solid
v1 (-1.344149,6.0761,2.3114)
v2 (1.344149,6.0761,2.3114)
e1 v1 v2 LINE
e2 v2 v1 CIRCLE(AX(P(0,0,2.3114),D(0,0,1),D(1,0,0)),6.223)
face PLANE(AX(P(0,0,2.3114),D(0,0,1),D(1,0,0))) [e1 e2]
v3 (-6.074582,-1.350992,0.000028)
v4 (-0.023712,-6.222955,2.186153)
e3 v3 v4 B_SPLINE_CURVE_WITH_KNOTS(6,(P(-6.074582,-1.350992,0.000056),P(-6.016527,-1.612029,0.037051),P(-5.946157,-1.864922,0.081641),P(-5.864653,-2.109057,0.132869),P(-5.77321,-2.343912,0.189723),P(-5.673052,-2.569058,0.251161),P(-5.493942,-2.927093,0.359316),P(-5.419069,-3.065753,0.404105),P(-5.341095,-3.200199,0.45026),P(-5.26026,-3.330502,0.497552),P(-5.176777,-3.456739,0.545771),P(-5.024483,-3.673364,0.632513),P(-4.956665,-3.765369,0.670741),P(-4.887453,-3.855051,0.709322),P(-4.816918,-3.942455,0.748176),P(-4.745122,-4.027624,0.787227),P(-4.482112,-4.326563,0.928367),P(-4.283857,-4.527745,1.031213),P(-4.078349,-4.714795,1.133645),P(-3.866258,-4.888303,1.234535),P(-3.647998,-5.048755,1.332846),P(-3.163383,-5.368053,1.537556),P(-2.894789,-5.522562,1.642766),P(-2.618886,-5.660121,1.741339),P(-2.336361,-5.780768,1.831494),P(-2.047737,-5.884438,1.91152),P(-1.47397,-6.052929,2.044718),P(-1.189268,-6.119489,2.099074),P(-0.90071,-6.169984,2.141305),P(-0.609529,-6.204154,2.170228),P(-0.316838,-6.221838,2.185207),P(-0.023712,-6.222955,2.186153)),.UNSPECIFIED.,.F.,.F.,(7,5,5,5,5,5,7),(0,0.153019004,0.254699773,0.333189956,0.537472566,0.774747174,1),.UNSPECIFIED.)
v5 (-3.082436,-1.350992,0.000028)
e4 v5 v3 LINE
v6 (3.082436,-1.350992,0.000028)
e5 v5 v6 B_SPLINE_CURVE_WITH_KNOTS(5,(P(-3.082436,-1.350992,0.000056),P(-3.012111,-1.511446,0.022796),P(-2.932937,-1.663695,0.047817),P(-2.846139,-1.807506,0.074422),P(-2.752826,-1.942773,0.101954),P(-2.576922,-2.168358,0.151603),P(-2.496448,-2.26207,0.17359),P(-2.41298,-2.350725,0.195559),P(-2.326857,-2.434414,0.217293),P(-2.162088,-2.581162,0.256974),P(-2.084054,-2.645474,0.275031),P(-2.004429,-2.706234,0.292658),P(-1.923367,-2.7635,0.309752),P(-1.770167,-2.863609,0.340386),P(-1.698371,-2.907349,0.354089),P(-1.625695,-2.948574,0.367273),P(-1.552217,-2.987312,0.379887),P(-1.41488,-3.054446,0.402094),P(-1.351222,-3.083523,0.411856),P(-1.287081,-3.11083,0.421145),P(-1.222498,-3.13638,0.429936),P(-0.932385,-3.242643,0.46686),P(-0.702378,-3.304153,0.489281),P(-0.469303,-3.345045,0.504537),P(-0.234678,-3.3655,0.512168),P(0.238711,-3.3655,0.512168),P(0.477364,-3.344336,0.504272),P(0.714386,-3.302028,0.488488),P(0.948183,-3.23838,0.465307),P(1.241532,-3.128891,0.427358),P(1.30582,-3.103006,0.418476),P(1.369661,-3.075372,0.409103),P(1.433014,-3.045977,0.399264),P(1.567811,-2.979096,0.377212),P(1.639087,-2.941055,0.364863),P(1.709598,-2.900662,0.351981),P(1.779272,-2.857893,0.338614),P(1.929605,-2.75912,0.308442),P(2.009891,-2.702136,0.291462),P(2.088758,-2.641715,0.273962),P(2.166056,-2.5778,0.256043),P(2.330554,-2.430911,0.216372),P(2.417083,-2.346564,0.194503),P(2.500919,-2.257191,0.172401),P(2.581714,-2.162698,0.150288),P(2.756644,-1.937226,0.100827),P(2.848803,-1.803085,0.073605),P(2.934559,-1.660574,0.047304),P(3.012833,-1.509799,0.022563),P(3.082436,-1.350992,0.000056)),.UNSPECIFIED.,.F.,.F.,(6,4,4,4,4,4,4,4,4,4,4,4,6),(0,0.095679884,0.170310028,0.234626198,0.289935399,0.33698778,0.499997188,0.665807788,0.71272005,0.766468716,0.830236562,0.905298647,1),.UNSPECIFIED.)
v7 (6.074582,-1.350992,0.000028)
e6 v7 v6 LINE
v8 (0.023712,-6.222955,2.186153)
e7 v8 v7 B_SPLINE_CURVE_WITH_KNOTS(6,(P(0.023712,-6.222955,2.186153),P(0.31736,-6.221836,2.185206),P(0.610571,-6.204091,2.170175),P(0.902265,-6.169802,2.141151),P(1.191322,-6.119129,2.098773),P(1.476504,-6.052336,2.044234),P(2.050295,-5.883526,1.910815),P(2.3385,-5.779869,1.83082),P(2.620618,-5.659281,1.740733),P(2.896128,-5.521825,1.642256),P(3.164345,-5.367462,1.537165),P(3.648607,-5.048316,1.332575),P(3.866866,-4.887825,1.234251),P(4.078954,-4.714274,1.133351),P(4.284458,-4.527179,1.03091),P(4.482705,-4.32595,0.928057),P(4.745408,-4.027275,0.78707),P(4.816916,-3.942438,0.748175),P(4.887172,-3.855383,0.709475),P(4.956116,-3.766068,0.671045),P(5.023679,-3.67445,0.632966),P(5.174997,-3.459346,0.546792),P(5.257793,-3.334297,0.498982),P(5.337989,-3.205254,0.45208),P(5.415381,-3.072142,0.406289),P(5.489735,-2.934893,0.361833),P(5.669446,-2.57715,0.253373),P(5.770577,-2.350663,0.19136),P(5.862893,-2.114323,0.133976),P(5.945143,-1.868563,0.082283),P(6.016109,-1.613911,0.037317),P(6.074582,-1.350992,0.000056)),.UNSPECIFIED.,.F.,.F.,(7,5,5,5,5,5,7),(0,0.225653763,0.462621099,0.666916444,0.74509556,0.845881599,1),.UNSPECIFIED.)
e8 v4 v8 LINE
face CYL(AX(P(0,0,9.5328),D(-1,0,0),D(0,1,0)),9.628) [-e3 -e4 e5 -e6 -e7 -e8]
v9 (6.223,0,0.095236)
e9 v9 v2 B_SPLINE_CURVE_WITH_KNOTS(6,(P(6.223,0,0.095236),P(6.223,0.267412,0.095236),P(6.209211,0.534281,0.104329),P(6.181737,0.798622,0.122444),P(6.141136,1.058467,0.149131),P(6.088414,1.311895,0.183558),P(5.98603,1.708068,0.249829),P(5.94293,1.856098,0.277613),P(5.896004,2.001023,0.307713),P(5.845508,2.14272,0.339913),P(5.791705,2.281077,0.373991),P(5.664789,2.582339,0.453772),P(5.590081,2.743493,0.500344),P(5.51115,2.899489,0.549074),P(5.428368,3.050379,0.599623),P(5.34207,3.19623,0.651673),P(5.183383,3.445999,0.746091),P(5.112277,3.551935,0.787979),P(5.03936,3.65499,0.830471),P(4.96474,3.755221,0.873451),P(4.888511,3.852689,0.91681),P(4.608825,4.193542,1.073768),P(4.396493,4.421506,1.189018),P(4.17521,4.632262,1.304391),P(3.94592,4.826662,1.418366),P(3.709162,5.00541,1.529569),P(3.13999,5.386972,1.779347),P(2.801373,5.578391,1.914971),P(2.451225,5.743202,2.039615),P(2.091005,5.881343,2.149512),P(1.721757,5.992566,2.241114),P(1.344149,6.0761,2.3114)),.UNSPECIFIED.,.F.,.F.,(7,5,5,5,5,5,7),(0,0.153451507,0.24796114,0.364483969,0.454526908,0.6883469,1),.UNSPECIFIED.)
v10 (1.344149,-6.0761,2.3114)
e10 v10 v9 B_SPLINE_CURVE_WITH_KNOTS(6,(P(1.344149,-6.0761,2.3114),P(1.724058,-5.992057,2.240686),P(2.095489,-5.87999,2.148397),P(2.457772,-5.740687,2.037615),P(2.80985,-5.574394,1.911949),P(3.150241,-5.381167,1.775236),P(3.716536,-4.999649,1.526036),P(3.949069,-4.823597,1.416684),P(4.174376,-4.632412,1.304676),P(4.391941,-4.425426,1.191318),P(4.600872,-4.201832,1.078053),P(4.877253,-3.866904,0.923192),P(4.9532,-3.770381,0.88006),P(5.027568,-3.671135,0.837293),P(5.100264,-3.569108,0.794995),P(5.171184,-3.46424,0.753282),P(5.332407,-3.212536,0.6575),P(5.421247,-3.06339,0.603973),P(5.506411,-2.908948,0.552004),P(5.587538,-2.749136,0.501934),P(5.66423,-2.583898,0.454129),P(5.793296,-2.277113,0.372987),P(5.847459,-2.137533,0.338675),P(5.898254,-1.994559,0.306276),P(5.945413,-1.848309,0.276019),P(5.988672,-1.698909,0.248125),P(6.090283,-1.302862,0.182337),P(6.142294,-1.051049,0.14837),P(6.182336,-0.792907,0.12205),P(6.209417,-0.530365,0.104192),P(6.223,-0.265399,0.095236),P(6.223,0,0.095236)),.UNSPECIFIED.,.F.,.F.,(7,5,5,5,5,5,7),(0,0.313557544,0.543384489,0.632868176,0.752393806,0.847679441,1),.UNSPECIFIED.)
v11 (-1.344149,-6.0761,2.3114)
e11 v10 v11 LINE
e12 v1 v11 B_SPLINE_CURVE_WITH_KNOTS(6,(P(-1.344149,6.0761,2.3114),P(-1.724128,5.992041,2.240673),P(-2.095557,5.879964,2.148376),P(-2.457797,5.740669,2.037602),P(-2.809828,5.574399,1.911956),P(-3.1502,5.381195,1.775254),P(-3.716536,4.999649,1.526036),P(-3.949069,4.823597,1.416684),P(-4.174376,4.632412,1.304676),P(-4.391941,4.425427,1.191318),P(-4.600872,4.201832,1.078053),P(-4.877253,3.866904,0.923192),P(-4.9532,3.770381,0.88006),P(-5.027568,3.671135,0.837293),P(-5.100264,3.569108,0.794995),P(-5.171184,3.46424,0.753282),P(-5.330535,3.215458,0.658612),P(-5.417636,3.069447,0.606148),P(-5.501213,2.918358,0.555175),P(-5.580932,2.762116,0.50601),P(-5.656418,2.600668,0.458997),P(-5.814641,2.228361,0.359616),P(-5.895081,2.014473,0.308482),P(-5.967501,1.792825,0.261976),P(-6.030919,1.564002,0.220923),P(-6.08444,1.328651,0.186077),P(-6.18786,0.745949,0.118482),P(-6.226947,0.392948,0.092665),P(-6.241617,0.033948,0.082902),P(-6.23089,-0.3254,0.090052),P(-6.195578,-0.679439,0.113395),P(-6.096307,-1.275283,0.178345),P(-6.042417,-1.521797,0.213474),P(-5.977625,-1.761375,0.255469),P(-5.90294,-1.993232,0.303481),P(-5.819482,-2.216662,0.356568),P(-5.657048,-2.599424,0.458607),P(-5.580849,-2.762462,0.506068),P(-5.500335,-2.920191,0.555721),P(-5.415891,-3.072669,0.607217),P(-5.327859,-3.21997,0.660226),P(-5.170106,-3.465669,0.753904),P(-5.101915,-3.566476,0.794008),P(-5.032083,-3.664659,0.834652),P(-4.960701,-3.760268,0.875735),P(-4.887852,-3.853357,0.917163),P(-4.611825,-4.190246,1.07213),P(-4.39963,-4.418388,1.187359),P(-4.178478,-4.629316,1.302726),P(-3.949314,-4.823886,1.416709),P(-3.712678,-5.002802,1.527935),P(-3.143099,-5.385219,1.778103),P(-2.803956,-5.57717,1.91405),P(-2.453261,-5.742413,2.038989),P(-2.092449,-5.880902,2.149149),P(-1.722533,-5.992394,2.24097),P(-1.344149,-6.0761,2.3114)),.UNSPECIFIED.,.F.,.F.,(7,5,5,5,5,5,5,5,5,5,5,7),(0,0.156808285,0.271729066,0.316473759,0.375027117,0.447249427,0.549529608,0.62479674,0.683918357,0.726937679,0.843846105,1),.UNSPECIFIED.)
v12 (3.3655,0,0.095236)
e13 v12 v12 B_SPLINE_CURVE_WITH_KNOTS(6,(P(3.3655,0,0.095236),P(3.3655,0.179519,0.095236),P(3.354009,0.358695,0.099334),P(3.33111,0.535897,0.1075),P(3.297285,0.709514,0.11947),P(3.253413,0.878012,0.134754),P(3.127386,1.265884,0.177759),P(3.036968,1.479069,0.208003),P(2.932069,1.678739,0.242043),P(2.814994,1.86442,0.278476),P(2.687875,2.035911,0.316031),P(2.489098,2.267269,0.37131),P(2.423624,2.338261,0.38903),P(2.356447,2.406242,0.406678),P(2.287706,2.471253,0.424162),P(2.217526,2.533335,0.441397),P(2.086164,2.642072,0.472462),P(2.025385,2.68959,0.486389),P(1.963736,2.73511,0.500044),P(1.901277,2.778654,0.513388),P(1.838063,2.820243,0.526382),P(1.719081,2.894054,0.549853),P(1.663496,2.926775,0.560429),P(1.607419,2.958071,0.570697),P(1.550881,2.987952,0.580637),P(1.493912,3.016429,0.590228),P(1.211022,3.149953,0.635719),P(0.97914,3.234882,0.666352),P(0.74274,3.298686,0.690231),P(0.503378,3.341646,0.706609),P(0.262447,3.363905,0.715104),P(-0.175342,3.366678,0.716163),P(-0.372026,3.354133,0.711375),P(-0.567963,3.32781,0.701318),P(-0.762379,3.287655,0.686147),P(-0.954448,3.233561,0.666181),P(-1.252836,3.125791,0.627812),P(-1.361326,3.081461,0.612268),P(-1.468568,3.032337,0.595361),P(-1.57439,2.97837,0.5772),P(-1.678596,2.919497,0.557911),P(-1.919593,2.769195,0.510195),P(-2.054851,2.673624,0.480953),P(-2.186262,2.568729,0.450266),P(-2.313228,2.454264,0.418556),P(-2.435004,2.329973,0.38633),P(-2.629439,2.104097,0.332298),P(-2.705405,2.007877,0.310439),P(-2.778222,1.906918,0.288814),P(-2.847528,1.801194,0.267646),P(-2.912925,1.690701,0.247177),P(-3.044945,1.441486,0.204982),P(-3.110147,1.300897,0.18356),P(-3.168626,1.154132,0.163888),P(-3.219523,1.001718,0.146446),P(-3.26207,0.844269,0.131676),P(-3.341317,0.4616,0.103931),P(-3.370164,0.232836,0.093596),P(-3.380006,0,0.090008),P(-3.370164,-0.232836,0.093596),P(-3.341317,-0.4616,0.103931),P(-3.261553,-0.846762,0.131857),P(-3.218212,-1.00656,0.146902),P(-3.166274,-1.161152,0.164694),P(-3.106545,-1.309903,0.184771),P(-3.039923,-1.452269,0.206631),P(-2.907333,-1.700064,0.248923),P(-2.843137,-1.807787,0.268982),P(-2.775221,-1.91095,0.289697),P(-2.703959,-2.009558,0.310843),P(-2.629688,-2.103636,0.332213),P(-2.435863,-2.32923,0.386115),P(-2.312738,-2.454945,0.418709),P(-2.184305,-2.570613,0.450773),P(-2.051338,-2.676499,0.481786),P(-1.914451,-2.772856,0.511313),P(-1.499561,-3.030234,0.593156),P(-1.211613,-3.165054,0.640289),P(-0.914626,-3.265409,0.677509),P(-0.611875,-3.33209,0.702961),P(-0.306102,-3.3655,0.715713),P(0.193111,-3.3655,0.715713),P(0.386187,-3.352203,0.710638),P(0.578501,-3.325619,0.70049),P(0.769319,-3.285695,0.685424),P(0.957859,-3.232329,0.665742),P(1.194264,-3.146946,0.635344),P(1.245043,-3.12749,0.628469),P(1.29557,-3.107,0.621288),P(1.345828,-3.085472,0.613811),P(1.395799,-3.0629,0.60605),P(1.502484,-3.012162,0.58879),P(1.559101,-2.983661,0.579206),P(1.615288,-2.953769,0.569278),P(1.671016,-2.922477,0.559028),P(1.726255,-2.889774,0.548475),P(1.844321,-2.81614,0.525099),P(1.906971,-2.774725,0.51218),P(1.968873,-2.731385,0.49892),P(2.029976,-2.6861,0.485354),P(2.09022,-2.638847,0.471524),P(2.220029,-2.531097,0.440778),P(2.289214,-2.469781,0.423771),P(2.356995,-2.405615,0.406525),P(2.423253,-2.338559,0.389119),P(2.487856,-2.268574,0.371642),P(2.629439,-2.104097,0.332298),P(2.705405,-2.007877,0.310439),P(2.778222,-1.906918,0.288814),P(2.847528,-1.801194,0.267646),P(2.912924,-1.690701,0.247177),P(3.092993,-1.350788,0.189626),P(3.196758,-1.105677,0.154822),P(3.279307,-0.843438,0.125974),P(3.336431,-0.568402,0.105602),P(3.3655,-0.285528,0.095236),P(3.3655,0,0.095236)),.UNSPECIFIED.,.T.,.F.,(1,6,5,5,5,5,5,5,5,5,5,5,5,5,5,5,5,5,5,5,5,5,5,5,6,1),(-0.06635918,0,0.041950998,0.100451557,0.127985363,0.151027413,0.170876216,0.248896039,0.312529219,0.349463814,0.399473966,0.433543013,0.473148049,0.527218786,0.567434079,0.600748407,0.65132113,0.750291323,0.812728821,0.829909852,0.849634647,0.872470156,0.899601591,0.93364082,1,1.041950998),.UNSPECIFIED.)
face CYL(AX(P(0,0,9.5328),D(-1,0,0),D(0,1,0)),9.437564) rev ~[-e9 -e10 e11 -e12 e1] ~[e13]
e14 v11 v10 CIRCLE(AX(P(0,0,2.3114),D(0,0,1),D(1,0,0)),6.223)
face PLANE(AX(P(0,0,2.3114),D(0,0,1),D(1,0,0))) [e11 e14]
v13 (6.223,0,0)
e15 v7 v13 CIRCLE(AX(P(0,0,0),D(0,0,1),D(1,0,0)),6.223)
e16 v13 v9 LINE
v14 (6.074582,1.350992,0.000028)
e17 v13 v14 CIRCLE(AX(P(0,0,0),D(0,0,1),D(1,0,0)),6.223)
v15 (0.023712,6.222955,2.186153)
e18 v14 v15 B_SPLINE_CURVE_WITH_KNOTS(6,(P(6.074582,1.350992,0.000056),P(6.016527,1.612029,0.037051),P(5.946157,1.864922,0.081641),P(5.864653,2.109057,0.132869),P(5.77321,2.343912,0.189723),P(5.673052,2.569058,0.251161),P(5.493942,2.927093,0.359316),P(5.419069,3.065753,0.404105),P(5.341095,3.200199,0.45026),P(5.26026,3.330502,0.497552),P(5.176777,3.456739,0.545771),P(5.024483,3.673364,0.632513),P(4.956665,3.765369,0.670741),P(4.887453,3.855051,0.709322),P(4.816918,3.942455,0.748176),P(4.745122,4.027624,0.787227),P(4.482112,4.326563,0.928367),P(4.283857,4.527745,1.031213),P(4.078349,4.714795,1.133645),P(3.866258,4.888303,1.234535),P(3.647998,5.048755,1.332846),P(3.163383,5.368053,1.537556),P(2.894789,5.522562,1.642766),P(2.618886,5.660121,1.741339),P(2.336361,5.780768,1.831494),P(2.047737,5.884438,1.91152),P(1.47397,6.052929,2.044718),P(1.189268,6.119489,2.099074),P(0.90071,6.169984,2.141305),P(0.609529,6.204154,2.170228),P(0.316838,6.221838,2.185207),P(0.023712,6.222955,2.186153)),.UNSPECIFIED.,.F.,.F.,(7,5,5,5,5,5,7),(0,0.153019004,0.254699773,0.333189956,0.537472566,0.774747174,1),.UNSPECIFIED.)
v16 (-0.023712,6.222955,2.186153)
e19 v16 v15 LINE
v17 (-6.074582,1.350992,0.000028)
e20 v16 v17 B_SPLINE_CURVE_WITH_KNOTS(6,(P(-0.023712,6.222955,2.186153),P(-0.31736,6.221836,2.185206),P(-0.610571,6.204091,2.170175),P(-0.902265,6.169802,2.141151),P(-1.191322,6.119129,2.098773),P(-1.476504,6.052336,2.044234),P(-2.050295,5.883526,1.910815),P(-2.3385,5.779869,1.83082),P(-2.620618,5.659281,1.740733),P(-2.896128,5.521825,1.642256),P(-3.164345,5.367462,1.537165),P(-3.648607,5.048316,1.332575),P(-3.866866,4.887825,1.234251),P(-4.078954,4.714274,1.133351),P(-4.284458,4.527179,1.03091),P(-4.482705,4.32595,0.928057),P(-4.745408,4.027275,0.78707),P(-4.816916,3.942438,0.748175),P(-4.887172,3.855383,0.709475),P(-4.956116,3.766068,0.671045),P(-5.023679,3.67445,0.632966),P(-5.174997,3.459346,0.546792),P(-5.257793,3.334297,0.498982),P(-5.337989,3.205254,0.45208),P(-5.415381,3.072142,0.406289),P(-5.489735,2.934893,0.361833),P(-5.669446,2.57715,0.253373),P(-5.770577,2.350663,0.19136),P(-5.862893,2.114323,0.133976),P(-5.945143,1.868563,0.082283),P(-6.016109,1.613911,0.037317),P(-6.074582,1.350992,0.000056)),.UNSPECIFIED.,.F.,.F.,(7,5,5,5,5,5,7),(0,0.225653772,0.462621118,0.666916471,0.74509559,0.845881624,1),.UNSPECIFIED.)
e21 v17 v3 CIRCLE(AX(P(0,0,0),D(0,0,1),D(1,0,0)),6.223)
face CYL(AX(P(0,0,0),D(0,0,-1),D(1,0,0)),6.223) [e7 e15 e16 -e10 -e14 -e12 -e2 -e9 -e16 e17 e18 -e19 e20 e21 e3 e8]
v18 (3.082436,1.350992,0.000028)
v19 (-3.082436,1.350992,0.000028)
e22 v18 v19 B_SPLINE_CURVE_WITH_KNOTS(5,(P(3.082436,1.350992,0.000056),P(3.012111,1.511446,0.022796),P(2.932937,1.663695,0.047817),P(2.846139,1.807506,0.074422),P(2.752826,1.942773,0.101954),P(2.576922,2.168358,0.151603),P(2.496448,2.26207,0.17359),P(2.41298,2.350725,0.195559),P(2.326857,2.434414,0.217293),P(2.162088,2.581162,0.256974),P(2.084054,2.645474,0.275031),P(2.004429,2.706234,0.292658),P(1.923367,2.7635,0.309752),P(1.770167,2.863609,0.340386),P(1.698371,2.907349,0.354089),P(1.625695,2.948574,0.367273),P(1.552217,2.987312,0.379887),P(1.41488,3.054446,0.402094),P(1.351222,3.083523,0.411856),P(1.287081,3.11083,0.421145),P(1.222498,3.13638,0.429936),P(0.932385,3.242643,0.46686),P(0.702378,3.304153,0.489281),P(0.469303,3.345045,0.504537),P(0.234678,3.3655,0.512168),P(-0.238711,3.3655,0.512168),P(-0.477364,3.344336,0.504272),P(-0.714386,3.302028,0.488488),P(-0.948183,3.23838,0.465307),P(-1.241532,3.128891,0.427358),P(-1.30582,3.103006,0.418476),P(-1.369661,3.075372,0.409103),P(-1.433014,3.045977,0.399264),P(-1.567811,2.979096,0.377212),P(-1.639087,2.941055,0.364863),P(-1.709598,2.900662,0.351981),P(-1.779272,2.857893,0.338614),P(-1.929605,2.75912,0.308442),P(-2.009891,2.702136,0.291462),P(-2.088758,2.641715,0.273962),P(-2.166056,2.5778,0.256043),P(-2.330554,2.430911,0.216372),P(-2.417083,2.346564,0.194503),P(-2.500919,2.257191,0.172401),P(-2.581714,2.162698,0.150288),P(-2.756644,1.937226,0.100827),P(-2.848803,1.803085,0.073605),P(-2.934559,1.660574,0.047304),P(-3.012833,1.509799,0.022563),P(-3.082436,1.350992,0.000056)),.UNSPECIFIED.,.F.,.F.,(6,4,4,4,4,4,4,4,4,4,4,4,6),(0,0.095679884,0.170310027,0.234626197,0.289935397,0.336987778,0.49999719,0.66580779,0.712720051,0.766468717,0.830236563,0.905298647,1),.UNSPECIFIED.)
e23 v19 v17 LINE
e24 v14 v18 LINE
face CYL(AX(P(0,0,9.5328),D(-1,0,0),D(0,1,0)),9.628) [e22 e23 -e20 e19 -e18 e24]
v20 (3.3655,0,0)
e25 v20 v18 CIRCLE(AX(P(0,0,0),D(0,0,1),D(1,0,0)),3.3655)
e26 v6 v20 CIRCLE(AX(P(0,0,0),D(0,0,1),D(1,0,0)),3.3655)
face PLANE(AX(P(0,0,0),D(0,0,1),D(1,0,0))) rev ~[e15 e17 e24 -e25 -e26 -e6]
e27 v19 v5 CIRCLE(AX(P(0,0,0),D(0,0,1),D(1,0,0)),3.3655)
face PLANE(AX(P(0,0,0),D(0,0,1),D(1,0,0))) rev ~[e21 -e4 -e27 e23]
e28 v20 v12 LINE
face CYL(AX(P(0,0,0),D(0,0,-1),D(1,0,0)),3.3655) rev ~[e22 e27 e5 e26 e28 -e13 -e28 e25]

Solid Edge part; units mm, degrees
sketch "Sketch1" plane through (0, 0, 0) normal (0, 0, 1) x (1, 0, 0)
  circle A0 centre (0, 0) radius 3.3655
  circle A1 centre (0, 0) radius 6.223
  dimension "D1" = 12.446
  dimension "D2" = 6.731
extrude "Protrusion1" add sketch "Sketch1" along normal blind 2.3114
sketch "Sketch2" plane through (0, 0, 0) normal (1, 0, 0) x (0, 1, 0)
  arc A0 (-6.0761, 2.3114) -> (6.0761, 2.3114) centre (0, 9.5328) ccw
  line L0 (-6.0761, 2.3114) -> (6.0761, 2.3114)
  arc A1 (-6.223, 2.1861) -> (-1.351, 0) centre (0, 9.5328) ccw
  line L1 (-1.351, 0) -> (-6.223, 0)
  line L2 (-6.223, 2.1861) -> (-6.223, 0)
  line L3 (6.223, 0) -> (1.351, 0)
  arc A2 (1.351, 0) -> (6.223, 2.1861) centre (0, 9.5328) ccw
  line L4 (6.223, 0) -> (6.223, 2.1861)
  dimension "D1" = 0.0952
extrude "ExtrudedCutout_1" cut sketch "Sketch2" along normal mid plane 38.1
